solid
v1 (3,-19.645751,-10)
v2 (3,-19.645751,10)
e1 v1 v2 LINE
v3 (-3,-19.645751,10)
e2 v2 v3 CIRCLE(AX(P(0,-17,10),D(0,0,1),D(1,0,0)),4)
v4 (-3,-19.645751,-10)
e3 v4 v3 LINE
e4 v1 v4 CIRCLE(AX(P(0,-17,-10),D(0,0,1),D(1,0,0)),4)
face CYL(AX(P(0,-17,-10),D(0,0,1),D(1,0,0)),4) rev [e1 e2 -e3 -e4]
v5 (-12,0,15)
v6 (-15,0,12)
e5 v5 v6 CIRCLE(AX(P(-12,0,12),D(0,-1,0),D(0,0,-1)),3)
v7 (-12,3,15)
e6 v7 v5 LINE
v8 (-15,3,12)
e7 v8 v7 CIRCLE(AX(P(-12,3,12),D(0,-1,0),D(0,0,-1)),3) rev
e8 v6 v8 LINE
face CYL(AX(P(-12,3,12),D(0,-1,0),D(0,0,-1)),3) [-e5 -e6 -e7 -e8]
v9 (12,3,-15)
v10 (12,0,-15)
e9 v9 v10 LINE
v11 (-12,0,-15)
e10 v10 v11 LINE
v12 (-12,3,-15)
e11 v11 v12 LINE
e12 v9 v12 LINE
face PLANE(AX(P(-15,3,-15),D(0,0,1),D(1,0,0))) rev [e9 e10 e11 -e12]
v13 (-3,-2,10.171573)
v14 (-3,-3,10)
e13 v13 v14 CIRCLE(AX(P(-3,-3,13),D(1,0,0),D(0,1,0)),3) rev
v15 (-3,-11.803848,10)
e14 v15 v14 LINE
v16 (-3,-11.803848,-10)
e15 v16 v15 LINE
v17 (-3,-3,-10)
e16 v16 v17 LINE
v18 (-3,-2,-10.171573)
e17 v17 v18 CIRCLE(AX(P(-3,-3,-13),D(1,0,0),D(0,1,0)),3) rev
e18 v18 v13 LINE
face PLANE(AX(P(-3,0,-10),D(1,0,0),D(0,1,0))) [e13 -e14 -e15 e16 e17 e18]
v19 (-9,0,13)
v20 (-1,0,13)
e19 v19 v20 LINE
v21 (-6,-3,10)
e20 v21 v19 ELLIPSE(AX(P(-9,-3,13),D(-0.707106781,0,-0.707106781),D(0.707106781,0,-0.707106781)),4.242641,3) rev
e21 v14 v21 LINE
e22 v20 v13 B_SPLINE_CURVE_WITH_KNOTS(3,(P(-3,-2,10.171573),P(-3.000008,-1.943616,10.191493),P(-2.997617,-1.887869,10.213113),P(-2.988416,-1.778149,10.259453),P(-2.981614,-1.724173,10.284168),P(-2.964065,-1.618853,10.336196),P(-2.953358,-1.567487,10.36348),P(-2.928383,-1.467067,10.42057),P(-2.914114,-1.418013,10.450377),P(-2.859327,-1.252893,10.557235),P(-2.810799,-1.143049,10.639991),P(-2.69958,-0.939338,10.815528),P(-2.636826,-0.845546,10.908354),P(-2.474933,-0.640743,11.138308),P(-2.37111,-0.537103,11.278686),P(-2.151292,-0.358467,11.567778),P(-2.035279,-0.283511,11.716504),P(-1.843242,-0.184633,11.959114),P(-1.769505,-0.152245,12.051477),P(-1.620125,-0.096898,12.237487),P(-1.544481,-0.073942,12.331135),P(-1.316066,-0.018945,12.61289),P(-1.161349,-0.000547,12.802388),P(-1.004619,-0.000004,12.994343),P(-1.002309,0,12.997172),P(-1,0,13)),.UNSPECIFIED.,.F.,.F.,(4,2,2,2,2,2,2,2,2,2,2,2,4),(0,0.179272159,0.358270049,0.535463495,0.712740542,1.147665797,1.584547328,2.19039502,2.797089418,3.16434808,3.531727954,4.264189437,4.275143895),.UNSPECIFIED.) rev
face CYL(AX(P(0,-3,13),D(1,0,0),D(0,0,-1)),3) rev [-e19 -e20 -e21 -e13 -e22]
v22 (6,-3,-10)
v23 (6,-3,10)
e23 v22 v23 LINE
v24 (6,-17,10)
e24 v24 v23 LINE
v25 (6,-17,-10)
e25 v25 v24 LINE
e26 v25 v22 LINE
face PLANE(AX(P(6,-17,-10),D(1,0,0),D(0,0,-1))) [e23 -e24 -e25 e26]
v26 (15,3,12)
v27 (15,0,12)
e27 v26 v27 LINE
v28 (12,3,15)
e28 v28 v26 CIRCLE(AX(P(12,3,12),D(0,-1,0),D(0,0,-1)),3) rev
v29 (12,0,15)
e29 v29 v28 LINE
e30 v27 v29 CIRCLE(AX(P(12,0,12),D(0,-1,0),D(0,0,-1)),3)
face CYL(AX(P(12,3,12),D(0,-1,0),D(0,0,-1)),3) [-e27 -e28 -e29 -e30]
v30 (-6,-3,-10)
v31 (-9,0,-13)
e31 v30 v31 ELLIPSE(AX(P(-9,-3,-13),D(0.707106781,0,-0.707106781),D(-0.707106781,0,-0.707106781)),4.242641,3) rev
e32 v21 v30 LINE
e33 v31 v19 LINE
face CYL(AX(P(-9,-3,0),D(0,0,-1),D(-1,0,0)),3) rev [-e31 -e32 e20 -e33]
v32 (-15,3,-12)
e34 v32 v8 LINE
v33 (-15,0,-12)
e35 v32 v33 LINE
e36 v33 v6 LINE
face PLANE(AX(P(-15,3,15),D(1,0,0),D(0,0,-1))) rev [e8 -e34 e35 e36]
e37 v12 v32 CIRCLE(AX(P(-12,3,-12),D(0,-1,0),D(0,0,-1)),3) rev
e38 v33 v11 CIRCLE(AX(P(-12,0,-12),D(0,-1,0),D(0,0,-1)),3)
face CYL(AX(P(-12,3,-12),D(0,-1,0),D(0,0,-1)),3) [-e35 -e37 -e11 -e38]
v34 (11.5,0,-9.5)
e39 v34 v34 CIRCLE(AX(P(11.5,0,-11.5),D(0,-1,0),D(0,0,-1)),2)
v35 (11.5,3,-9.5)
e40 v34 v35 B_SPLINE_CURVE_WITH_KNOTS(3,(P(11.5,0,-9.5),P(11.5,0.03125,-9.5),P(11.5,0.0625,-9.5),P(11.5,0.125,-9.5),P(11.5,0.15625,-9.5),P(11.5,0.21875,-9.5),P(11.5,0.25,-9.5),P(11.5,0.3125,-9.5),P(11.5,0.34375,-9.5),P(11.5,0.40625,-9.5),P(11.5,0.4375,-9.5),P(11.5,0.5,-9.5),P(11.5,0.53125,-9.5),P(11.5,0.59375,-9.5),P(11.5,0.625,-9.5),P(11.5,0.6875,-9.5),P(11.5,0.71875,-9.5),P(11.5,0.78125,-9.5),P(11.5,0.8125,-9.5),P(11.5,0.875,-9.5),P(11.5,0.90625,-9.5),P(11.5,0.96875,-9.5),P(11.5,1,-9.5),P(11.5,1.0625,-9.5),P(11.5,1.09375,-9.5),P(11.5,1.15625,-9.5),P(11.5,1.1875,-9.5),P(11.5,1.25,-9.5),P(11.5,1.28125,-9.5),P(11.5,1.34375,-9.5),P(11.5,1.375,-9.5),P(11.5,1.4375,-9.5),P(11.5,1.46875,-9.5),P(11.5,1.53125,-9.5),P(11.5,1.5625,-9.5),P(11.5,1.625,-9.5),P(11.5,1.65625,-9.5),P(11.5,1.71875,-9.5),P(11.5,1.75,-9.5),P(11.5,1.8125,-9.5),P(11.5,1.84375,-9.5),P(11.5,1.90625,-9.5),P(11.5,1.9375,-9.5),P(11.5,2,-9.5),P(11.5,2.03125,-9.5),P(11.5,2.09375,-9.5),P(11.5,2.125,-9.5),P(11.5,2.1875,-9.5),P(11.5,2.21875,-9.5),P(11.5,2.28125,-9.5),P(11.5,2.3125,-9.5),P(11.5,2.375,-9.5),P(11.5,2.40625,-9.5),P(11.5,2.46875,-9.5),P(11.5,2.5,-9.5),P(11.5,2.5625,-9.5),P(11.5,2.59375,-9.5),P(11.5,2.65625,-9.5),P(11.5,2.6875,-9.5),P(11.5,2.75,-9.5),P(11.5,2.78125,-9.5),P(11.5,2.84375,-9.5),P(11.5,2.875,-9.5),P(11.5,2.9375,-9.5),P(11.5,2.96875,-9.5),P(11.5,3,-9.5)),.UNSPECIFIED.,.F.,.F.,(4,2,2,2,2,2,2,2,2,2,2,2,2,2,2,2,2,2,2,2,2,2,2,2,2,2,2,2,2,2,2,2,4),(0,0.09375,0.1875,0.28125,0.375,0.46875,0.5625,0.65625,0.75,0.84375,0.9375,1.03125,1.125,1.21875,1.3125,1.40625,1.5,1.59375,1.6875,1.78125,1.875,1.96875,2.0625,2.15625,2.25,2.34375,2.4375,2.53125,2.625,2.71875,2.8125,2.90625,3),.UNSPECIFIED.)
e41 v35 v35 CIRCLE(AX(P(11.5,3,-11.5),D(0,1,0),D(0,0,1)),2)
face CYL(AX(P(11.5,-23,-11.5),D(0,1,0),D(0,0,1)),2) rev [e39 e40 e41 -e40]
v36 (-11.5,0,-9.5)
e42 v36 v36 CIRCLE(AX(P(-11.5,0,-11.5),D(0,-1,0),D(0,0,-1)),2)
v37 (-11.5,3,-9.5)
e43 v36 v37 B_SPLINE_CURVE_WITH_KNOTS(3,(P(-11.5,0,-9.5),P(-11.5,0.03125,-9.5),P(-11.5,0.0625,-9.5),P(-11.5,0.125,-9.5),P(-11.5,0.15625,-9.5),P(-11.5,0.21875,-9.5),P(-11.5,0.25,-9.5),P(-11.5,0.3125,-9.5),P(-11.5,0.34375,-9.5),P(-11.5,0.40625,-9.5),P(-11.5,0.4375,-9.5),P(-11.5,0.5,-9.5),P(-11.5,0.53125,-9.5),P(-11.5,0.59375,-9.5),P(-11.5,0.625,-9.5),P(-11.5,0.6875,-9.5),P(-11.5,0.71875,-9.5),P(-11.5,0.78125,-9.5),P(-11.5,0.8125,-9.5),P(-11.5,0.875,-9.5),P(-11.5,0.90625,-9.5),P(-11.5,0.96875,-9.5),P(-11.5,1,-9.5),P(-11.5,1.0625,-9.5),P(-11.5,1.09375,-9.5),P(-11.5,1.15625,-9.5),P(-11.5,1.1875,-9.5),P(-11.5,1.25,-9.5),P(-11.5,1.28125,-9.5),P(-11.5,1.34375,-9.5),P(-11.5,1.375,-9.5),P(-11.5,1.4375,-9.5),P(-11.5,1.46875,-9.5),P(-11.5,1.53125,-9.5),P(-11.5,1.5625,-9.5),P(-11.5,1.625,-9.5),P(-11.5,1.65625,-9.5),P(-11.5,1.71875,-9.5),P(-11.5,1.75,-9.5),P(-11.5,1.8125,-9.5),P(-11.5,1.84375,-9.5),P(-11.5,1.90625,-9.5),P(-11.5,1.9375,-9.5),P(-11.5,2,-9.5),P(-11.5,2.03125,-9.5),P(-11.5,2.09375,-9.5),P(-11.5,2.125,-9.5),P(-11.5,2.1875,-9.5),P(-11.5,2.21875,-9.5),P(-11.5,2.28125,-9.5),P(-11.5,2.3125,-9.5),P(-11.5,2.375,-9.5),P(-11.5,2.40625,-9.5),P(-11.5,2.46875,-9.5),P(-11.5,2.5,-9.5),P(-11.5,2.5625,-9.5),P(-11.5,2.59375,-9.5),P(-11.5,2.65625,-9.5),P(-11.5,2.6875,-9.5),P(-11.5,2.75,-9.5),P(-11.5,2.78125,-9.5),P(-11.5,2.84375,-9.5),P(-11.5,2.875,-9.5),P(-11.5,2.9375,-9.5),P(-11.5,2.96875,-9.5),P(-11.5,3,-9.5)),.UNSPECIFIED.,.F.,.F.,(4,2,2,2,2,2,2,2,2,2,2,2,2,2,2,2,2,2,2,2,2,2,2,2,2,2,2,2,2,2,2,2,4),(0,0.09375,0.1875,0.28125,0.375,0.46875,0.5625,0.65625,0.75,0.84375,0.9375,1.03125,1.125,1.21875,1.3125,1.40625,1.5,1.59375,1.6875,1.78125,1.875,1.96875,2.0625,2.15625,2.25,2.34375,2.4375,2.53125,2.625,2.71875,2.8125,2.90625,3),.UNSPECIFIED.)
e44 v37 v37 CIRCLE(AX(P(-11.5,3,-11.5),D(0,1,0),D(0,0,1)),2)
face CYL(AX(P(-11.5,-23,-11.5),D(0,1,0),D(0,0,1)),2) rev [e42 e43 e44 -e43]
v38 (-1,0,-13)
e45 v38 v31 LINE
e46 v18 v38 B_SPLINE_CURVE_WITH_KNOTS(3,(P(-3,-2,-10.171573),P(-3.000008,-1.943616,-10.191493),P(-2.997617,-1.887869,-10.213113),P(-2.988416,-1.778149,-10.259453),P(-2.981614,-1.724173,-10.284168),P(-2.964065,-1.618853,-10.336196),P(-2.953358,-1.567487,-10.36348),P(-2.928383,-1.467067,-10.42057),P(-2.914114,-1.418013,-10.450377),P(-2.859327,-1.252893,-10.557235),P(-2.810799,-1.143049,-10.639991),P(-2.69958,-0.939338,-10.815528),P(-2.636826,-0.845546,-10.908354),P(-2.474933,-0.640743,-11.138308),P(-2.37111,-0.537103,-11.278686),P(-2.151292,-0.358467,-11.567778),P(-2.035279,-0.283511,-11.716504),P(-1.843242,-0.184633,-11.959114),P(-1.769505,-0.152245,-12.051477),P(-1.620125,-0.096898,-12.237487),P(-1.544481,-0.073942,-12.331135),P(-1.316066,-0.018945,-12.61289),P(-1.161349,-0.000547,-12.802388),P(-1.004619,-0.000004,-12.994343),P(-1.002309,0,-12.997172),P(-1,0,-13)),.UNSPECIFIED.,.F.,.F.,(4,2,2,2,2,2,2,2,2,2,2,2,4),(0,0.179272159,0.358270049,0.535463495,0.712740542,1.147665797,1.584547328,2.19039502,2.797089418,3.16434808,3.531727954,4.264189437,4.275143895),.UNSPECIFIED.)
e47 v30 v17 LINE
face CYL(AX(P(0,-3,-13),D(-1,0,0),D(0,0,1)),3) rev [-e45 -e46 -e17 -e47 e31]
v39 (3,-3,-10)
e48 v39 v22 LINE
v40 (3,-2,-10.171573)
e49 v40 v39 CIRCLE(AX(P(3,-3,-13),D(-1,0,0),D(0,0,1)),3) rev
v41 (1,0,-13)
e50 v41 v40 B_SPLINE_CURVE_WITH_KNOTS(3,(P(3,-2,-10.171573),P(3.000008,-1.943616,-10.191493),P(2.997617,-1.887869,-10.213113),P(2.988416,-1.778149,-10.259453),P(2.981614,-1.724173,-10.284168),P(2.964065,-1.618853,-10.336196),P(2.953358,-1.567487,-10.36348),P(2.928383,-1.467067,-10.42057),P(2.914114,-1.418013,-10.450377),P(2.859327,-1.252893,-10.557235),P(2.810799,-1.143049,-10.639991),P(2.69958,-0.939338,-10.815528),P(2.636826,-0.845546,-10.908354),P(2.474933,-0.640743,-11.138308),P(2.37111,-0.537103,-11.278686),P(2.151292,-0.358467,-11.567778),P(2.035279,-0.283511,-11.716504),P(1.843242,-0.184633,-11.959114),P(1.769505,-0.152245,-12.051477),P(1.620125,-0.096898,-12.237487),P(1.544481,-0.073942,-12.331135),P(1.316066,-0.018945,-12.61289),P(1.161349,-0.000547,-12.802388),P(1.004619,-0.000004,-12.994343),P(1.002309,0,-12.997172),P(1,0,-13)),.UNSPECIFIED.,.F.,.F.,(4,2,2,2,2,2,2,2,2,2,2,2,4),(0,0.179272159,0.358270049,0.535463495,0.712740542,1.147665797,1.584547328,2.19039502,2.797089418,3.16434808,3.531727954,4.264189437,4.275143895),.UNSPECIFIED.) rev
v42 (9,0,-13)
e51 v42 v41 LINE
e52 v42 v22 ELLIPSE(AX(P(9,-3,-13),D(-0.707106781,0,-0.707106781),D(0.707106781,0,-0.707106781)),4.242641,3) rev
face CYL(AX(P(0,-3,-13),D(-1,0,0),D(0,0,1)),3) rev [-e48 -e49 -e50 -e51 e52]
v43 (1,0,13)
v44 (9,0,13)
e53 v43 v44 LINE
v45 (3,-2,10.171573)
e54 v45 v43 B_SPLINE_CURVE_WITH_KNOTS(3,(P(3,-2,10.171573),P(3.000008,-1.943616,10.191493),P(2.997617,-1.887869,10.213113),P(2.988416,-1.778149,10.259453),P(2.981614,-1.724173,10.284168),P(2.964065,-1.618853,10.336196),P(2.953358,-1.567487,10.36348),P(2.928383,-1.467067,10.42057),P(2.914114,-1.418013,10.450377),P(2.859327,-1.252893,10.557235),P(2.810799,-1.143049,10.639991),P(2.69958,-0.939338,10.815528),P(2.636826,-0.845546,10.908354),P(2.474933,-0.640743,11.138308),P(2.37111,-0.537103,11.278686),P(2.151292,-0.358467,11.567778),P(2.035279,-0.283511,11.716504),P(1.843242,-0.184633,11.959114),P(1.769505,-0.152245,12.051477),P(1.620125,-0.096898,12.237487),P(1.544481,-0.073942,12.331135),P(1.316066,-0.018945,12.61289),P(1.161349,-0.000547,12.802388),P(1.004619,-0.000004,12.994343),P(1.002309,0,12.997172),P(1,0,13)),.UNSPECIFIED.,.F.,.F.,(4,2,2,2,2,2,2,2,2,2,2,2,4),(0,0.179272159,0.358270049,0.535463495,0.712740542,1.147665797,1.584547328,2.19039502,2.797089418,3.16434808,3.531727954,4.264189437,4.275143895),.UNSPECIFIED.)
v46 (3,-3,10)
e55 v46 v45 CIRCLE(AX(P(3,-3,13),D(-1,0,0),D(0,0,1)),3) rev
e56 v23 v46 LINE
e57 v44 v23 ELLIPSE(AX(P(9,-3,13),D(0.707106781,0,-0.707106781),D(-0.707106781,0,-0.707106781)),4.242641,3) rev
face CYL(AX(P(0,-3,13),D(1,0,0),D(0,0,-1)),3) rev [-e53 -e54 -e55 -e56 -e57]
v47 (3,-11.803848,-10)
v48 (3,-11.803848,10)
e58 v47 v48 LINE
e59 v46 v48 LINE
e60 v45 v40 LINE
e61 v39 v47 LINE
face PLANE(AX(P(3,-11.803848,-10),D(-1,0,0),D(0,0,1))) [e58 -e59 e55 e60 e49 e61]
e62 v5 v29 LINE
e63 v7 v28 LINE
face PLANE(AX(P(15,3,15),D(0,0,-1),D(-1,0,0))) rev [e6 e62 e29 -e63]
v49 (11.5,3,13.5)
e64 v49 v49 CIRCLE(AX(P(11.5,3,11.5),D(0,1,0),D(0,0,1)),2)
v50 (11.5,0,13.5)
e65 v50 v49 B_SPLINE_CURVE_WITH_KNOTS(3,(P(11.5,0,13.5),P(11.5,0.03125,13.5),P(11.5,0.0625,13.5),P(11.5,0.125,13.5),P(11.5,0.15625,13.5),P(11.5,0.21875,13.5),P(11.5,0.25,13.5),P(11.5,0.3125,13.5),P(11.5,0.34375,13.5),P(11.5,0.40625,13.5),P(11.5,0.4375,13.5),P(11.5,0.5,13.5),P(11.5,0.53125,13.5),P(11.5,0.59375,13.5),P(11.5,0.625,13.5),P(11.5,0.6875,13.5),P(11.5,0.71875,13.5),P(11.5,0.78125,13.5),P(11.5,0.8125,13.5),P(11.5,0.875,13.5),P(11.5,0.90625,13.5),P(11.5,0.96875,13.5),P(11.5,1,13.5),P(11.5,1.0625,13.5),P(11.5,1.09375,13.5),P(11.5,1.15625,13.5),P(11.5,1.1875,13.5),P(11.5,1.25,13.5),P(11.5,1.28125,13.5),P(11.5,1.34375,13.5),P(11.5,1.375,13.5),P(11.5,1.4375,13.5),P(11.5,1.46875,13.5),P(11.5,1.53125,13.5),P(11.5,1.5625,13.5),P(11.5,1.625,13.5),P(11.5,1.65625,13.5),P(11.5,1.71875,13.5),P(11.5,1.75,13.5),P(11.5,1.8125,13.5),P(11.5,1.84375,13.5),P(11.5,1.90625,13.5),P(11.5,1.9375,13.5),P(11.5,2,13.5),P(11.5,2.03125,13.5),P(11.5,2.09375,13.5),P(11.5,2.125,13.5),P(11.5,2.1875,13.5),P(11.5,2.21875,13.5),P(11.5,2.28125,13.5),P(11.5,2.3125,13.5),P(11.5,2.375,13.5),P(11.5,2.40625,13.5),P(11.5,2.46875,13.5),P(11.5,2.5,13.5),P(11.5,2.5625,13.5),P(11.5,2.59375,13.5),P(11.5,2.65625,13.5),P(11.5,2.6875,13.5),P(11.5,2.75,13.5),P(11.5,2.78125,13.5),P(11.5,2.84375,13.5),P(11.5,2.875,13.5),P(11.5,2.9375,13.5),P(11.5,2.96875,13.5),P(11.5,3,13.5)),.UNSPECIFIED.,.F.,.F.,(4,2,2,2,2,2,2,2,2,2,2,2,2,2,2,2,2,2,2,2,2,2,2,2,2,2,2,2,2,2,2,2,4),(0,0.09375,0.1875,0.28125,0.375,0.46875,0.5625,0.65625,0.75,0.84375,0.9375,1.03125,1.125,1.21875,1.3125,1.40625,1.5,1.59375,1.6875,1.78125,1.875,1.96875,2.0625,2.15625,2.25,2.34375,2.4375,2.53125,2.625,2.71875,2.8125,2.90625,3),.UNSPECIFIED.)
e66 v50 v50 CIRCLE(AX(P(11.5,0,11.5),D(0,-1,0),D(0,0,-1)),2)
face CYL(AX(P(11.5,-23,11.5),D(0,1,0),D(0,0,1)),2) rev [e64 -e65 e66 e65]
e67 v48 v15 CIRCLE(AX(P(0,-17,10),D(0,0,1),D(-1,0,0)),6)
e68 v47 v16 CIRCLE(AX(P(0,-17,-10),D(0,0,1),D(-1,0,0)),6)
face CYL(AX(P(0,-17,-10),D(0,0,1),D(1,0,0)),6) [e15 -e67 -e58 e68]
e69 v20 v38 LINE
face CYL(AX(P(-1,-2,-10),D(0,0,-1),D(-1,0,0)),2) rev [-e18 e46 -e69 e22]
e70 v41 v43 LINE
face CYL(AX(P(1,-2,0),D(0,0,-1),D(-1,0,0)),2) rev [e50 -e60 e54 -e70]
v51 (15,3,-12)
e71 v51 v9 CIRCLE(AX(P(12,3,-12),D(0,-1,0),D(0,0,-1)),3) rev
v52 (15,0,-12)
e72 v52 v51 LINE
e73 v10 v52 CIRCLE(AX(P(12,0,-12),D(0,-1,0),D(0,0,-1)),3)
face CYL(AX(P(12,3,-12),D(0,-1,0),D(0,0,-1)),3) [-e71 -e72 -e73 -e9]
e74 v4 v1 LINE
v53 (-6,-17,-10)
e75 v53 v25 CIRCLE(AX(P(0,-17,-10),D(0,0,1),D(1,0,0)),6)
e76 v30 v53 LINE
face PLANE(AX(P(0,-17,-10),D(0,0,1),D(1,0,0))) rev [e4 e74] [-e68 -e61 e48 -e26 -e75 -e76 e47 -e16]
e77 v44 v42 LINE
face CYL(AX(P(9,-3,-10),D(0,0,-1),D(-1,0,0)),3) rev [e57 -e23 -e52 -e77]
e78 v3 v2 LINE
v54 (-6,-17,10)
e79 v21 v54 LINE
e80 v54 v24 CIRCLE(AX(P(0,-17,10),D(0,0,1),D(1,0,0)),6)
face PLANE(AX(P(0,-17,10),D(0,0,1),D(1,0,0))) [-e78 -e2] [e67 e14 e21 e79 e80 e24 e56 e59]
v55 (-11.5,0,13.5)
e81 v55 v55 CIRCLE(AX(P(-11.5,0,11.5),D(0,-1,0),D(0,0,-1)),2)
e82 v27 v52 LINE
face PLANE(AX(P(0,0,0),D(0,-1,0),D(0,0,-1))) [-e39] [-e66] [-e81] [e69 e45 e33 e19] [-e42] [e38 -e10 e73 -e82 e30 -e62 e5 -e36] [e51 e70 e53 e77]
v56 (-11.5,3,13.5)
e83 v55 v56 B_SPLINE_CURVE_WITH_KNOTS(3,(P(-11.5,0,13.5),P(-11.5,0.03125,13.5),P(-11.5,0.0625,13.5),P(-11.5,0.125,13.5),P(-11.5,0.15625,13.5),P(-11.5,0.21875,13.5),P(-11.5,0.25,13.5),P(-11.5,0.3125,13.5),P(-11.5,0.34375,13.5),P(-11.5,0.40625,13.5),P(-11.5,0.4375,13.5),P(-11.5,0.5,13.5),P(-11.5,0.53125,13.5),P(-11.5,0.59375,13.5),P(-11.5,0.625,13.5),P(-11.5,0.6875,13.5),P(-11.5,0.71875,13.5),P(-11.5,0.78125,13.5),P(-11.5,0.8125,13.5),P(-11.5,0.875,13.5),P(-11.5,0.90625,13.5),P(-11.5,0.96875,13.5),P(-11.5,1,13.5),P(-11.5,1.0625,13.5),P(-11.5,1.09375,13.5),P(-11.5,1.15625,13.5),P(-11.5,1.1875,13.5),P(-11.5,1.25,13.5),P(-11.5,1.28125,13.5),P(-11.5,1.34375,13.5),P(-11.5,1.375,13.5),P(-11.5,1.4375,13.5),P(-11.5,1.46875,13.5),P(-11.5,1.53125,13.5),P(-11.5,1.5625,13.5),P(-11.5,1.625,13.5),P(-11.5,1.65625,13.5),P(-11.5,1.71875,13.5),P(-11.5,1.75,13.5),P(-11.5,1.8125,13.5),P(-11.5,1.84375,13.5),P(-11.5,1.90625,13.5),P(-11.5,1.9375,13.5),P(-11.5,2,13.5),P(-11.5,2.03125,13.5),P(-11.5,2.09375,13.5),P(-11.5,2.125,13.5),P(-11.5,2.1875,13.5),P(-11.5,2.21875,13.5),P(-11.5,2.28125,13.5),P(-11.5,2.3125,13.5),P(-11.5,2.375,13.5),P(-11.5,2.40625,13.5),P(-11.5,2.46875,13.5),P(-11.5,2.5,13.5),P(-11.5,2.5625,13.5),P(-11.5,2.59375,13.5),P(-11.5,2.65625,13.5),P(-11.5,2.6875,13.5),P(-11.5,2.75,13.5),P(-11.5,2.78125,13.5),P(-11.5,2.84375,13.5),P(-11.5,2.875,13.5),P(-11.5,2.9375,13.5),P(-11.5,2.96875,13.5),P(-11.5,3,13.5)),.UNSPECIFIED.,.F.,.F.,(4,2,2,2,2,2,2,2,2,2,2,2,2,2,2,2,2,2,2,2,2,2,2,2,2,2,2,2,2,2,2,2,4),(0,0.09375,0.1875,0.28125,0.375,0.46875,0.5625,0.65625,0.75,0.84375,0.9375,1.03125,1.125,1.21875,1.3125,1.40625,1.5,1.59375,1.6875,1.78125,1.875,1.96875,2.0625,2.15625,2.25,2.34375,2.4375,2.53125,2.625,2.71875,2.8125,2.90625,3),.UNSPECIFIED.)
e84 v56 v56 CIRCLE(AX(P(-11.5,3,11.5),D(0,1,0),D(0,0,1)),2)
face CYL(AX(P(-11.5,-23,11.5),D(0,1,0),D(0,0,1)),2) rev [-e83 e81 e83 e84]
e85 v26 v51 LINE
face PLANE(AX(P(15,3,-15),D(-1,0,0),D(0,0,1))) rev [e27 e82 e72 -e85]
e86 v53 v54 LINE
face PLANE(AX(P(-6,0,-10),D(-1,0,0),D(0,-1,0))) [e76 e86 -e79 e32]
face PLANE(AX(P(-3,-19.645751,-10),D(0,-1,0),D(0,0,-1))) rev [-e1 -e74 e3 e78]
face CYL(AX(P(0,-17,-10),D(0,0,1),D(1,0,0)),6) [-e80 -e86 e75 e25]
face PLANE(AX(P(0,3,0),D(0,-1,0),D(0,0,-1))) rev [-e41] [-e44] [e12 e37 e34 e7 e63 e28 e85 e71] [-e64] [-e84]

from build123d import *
from build123d.topology import SkipClean

# Parameters (mm, degrees)
CROQUIS1_W              = 30
CROQUIS1_H              = 30
SALIENTE_EXTRUIR1_DEPTH = 3
SALIENTE_EXTRUIR2_DEPTH = 20
CROQUIS4_R              = 2
CORTAR_EXTRUIR1_DEPTH   = 34.555923471
REDONDEO2_R             = 3
REDONDEO4_R             = 2
REDONDEO5_START         = -6
REDONDEO5_DEPTH         = 3
REDONDEO5_START_2       = 3
REDONDEO5_2_DEPTH       = 3
REDONDEO5_START_3       = -13.0000001
REDONDEO5_3_DEPTH       = 26.0000001
REDONDEO5_START_4       = -10
REDONDEO5_4_DEPTH       = 20


with BuildPart() as part:
    # Croquis1 → Saliente-Extruir1 (new body)
    with BuildSketch(Plane(origin=(0, 0, 0), x_dir=(1, 0, 0), z_dir=(0, 1, 0))):
        Rectangle(CROQUIS1_W, CROQUIS1_H)
    extrude(amount=SALIENTE_EXTRUIR1_DEPTH)

    # Croquis3 → Saliente-Extruir2 (add)
    with BuildSketch(Plane.XY.offset(10)):
        with BuildLine():
            Line((-3, 0), (-3, -11.803847577))
            ThreePointArc((-3, -11.803847577), (0, -11), (3, -11.803847577))
            Line((3, -11.803847577), (3, 0))
            Line((3, 0), (6, 0))
            Line((6, 0), (6, -17))
            ThreePointArc((6, -17), (0, -23), (-6, -17))
            Line((-6, -17), (-6, 0))
            Line((-6, 0), (-3, 0))
        make_face()
        with BuildLine():
            Line((-3, -19.645751311), (3, -19.645751311))
            ThreePointArc((3, -19.645751311), (0, -13), (-3, -19.645751311))
        make_face(mode=Mode.SUBTRACT)
    extrude(amount=-SALIENTE_EXTRUIR2_DEPTH)

    # Croquis4 → Cortar-Extruir1 (cut, through all)
    with BuildSketch(Plane(origin=(0, 3, 0), x_dir=(1, 0, 0), z_dir=(0, 1, 0))):
        with Locations(Location((-11.5, 11.5, 0), (0, 0, 270))):
            Circle(CROQUIS4_R)
        with Locations(Location((11.5, 11.5, 0), (0, 0, 270))):
            Circle(CROQUIS4_R)
        with Locations(Location((11.5, -11.5, 0), (0, 0, 270))):
            Circle(CROQUIS4_R)
        with Locations(Location((-11.5, -11.5, 0), (0, 0, 270))):
            Circle(CROQUIS4_R)
    extrude(amount=-CORTAR_EXTRUIR1_DEPTH, mode=Mode.SUBTRACT)

    # Redondeo2
    redondeo2_edges = [part.edges().sort_by_distance(p)[0] for p in [
        (-15, 1.5, -15),
        (15, 1.5, -15),
        (15, 1.5, 15),
        (-15, 1.5, 15),
    ]]
    fillet(redondeo2_edges, radius=REDONDEO2_R)

    # Redondeo4
    redondeo4_edges = [part.edges().sort_by_distance(p)[0] for p in [
        (-3, 0, 0),
        (3, 0, 0),
    ]]
    fillet(redondeo4_edges, radius=REDONDEO4_R)

    # Redondeo5: read off the stored shape, not the designer's step
    # Redondeo5 outline → Redondeo5 (add)
    with BuildSketch(Plane.YZ.offset(REDONDEO5_START)):
        with BuildLine():
            Line((0, -13), (0, -10))
            Line((0, -10), (-3, -10))
            ThreePointArc((-3, -10), (-0.878679656, -10.878679656), (0, -13))
        make_face()
        with BuildLine():
            ThreePointArc((0, 13), (-0.878679656, 10.878679656), (-3, 10))
            Line((-3, 10), (0, 10))
            Line((0, 10), (0, 13))
        make_face()
    extrude(amount=REDONDEO5_DEPTH)

    # Redondeo5 2 outline → Redondeo5 2 (add)
    with BuildSketch(Plane.YZ.offset(REDONDEO5_START_2)):
        with BuildLine():
            Line((0, -13), (0, -10))
            Line((0, -10), (-3, -10))
            ThreePointArc((-3, -10), (-0.878679656, -10.878679656), (0, -13))
        make_face()
        with BuildLine():
            ThreePointArc((0, 13), (-0.878679656, 10.878679656), (-3, 10))
            Line((-3, 10), (0, 10))
            Line((0, 10), (0, 13))
        make_face()
    extrude(amount=REDONDEO5_2_DEPTH)

    # Redondeo5 3 outline → Redondeo5 3 (add)
    with SkipClean():  # the faces are left unmerged after this step: merging them gives an invalid solid
        with BuildSketch(Plane.XY.offset(REDONDEO5_START_3)):
            with BuildLine():
                Line((-3, 0), (-3, -2))
                ThreePointArc((-3, -2), (-2.414213562, -0.585786438), (-1, 0))
                Line((-1, 0), (-3, 0))
            make_face()
            with BuildLine():
                Line((-6, -3), (-6, 0))
                Line((-6, 0), (-9, 0))
                ThreePointArc((-9, 0), (-6.878679656, -0.878679656), (-6, -3))
            make_face()
            with BuildLine():
                Line((9, 0), (6, 0))
                Line((6, 0), (6, -3))
                ThreePointArc((6, -3), (6.878679656, -0.878679656), (9, 0))
            make_face()
            with BuildLine():
                Line((3, 0), (1, 0))
                ThreePointArc((1, 0), (2.414213562, -0.585786438), (3, -2))
                Line((3, -2), (3, 0))
            make_face()
        extrude(amount=REDONDEO5_3_DEPTH)

    # Redondeo5 4 outline → Redondeo5 4 (cut)
    with SkipClean():  # the faces are left unmerged after this step: merging them gives an invalid solid
        with BuildSketch(Plane.YZ.offset(REDONDEO5_START_4)):
            with BuildLine():
                ThreePointArc((0, -13.00000005), (-0.878679638, -10.878679674), (-3, -10))
                Line((-3, -10), (-3, -13.0000001))
                Line((-3, -13.0000001), (0, -13.00000005))
            make_face()
            with BuildLine():
                Line((0, 13), (-3, 13))
                Line((-3, 13), (-3, 10))
                ThreePointArc((-3, 10), (-0.878679656, 10.878679656), (0, 13))
            make_face()
        extrude(amount=REDONDEO5_4_DEPTH, mode=Mode.SUBTRACT)


solid = part.part
